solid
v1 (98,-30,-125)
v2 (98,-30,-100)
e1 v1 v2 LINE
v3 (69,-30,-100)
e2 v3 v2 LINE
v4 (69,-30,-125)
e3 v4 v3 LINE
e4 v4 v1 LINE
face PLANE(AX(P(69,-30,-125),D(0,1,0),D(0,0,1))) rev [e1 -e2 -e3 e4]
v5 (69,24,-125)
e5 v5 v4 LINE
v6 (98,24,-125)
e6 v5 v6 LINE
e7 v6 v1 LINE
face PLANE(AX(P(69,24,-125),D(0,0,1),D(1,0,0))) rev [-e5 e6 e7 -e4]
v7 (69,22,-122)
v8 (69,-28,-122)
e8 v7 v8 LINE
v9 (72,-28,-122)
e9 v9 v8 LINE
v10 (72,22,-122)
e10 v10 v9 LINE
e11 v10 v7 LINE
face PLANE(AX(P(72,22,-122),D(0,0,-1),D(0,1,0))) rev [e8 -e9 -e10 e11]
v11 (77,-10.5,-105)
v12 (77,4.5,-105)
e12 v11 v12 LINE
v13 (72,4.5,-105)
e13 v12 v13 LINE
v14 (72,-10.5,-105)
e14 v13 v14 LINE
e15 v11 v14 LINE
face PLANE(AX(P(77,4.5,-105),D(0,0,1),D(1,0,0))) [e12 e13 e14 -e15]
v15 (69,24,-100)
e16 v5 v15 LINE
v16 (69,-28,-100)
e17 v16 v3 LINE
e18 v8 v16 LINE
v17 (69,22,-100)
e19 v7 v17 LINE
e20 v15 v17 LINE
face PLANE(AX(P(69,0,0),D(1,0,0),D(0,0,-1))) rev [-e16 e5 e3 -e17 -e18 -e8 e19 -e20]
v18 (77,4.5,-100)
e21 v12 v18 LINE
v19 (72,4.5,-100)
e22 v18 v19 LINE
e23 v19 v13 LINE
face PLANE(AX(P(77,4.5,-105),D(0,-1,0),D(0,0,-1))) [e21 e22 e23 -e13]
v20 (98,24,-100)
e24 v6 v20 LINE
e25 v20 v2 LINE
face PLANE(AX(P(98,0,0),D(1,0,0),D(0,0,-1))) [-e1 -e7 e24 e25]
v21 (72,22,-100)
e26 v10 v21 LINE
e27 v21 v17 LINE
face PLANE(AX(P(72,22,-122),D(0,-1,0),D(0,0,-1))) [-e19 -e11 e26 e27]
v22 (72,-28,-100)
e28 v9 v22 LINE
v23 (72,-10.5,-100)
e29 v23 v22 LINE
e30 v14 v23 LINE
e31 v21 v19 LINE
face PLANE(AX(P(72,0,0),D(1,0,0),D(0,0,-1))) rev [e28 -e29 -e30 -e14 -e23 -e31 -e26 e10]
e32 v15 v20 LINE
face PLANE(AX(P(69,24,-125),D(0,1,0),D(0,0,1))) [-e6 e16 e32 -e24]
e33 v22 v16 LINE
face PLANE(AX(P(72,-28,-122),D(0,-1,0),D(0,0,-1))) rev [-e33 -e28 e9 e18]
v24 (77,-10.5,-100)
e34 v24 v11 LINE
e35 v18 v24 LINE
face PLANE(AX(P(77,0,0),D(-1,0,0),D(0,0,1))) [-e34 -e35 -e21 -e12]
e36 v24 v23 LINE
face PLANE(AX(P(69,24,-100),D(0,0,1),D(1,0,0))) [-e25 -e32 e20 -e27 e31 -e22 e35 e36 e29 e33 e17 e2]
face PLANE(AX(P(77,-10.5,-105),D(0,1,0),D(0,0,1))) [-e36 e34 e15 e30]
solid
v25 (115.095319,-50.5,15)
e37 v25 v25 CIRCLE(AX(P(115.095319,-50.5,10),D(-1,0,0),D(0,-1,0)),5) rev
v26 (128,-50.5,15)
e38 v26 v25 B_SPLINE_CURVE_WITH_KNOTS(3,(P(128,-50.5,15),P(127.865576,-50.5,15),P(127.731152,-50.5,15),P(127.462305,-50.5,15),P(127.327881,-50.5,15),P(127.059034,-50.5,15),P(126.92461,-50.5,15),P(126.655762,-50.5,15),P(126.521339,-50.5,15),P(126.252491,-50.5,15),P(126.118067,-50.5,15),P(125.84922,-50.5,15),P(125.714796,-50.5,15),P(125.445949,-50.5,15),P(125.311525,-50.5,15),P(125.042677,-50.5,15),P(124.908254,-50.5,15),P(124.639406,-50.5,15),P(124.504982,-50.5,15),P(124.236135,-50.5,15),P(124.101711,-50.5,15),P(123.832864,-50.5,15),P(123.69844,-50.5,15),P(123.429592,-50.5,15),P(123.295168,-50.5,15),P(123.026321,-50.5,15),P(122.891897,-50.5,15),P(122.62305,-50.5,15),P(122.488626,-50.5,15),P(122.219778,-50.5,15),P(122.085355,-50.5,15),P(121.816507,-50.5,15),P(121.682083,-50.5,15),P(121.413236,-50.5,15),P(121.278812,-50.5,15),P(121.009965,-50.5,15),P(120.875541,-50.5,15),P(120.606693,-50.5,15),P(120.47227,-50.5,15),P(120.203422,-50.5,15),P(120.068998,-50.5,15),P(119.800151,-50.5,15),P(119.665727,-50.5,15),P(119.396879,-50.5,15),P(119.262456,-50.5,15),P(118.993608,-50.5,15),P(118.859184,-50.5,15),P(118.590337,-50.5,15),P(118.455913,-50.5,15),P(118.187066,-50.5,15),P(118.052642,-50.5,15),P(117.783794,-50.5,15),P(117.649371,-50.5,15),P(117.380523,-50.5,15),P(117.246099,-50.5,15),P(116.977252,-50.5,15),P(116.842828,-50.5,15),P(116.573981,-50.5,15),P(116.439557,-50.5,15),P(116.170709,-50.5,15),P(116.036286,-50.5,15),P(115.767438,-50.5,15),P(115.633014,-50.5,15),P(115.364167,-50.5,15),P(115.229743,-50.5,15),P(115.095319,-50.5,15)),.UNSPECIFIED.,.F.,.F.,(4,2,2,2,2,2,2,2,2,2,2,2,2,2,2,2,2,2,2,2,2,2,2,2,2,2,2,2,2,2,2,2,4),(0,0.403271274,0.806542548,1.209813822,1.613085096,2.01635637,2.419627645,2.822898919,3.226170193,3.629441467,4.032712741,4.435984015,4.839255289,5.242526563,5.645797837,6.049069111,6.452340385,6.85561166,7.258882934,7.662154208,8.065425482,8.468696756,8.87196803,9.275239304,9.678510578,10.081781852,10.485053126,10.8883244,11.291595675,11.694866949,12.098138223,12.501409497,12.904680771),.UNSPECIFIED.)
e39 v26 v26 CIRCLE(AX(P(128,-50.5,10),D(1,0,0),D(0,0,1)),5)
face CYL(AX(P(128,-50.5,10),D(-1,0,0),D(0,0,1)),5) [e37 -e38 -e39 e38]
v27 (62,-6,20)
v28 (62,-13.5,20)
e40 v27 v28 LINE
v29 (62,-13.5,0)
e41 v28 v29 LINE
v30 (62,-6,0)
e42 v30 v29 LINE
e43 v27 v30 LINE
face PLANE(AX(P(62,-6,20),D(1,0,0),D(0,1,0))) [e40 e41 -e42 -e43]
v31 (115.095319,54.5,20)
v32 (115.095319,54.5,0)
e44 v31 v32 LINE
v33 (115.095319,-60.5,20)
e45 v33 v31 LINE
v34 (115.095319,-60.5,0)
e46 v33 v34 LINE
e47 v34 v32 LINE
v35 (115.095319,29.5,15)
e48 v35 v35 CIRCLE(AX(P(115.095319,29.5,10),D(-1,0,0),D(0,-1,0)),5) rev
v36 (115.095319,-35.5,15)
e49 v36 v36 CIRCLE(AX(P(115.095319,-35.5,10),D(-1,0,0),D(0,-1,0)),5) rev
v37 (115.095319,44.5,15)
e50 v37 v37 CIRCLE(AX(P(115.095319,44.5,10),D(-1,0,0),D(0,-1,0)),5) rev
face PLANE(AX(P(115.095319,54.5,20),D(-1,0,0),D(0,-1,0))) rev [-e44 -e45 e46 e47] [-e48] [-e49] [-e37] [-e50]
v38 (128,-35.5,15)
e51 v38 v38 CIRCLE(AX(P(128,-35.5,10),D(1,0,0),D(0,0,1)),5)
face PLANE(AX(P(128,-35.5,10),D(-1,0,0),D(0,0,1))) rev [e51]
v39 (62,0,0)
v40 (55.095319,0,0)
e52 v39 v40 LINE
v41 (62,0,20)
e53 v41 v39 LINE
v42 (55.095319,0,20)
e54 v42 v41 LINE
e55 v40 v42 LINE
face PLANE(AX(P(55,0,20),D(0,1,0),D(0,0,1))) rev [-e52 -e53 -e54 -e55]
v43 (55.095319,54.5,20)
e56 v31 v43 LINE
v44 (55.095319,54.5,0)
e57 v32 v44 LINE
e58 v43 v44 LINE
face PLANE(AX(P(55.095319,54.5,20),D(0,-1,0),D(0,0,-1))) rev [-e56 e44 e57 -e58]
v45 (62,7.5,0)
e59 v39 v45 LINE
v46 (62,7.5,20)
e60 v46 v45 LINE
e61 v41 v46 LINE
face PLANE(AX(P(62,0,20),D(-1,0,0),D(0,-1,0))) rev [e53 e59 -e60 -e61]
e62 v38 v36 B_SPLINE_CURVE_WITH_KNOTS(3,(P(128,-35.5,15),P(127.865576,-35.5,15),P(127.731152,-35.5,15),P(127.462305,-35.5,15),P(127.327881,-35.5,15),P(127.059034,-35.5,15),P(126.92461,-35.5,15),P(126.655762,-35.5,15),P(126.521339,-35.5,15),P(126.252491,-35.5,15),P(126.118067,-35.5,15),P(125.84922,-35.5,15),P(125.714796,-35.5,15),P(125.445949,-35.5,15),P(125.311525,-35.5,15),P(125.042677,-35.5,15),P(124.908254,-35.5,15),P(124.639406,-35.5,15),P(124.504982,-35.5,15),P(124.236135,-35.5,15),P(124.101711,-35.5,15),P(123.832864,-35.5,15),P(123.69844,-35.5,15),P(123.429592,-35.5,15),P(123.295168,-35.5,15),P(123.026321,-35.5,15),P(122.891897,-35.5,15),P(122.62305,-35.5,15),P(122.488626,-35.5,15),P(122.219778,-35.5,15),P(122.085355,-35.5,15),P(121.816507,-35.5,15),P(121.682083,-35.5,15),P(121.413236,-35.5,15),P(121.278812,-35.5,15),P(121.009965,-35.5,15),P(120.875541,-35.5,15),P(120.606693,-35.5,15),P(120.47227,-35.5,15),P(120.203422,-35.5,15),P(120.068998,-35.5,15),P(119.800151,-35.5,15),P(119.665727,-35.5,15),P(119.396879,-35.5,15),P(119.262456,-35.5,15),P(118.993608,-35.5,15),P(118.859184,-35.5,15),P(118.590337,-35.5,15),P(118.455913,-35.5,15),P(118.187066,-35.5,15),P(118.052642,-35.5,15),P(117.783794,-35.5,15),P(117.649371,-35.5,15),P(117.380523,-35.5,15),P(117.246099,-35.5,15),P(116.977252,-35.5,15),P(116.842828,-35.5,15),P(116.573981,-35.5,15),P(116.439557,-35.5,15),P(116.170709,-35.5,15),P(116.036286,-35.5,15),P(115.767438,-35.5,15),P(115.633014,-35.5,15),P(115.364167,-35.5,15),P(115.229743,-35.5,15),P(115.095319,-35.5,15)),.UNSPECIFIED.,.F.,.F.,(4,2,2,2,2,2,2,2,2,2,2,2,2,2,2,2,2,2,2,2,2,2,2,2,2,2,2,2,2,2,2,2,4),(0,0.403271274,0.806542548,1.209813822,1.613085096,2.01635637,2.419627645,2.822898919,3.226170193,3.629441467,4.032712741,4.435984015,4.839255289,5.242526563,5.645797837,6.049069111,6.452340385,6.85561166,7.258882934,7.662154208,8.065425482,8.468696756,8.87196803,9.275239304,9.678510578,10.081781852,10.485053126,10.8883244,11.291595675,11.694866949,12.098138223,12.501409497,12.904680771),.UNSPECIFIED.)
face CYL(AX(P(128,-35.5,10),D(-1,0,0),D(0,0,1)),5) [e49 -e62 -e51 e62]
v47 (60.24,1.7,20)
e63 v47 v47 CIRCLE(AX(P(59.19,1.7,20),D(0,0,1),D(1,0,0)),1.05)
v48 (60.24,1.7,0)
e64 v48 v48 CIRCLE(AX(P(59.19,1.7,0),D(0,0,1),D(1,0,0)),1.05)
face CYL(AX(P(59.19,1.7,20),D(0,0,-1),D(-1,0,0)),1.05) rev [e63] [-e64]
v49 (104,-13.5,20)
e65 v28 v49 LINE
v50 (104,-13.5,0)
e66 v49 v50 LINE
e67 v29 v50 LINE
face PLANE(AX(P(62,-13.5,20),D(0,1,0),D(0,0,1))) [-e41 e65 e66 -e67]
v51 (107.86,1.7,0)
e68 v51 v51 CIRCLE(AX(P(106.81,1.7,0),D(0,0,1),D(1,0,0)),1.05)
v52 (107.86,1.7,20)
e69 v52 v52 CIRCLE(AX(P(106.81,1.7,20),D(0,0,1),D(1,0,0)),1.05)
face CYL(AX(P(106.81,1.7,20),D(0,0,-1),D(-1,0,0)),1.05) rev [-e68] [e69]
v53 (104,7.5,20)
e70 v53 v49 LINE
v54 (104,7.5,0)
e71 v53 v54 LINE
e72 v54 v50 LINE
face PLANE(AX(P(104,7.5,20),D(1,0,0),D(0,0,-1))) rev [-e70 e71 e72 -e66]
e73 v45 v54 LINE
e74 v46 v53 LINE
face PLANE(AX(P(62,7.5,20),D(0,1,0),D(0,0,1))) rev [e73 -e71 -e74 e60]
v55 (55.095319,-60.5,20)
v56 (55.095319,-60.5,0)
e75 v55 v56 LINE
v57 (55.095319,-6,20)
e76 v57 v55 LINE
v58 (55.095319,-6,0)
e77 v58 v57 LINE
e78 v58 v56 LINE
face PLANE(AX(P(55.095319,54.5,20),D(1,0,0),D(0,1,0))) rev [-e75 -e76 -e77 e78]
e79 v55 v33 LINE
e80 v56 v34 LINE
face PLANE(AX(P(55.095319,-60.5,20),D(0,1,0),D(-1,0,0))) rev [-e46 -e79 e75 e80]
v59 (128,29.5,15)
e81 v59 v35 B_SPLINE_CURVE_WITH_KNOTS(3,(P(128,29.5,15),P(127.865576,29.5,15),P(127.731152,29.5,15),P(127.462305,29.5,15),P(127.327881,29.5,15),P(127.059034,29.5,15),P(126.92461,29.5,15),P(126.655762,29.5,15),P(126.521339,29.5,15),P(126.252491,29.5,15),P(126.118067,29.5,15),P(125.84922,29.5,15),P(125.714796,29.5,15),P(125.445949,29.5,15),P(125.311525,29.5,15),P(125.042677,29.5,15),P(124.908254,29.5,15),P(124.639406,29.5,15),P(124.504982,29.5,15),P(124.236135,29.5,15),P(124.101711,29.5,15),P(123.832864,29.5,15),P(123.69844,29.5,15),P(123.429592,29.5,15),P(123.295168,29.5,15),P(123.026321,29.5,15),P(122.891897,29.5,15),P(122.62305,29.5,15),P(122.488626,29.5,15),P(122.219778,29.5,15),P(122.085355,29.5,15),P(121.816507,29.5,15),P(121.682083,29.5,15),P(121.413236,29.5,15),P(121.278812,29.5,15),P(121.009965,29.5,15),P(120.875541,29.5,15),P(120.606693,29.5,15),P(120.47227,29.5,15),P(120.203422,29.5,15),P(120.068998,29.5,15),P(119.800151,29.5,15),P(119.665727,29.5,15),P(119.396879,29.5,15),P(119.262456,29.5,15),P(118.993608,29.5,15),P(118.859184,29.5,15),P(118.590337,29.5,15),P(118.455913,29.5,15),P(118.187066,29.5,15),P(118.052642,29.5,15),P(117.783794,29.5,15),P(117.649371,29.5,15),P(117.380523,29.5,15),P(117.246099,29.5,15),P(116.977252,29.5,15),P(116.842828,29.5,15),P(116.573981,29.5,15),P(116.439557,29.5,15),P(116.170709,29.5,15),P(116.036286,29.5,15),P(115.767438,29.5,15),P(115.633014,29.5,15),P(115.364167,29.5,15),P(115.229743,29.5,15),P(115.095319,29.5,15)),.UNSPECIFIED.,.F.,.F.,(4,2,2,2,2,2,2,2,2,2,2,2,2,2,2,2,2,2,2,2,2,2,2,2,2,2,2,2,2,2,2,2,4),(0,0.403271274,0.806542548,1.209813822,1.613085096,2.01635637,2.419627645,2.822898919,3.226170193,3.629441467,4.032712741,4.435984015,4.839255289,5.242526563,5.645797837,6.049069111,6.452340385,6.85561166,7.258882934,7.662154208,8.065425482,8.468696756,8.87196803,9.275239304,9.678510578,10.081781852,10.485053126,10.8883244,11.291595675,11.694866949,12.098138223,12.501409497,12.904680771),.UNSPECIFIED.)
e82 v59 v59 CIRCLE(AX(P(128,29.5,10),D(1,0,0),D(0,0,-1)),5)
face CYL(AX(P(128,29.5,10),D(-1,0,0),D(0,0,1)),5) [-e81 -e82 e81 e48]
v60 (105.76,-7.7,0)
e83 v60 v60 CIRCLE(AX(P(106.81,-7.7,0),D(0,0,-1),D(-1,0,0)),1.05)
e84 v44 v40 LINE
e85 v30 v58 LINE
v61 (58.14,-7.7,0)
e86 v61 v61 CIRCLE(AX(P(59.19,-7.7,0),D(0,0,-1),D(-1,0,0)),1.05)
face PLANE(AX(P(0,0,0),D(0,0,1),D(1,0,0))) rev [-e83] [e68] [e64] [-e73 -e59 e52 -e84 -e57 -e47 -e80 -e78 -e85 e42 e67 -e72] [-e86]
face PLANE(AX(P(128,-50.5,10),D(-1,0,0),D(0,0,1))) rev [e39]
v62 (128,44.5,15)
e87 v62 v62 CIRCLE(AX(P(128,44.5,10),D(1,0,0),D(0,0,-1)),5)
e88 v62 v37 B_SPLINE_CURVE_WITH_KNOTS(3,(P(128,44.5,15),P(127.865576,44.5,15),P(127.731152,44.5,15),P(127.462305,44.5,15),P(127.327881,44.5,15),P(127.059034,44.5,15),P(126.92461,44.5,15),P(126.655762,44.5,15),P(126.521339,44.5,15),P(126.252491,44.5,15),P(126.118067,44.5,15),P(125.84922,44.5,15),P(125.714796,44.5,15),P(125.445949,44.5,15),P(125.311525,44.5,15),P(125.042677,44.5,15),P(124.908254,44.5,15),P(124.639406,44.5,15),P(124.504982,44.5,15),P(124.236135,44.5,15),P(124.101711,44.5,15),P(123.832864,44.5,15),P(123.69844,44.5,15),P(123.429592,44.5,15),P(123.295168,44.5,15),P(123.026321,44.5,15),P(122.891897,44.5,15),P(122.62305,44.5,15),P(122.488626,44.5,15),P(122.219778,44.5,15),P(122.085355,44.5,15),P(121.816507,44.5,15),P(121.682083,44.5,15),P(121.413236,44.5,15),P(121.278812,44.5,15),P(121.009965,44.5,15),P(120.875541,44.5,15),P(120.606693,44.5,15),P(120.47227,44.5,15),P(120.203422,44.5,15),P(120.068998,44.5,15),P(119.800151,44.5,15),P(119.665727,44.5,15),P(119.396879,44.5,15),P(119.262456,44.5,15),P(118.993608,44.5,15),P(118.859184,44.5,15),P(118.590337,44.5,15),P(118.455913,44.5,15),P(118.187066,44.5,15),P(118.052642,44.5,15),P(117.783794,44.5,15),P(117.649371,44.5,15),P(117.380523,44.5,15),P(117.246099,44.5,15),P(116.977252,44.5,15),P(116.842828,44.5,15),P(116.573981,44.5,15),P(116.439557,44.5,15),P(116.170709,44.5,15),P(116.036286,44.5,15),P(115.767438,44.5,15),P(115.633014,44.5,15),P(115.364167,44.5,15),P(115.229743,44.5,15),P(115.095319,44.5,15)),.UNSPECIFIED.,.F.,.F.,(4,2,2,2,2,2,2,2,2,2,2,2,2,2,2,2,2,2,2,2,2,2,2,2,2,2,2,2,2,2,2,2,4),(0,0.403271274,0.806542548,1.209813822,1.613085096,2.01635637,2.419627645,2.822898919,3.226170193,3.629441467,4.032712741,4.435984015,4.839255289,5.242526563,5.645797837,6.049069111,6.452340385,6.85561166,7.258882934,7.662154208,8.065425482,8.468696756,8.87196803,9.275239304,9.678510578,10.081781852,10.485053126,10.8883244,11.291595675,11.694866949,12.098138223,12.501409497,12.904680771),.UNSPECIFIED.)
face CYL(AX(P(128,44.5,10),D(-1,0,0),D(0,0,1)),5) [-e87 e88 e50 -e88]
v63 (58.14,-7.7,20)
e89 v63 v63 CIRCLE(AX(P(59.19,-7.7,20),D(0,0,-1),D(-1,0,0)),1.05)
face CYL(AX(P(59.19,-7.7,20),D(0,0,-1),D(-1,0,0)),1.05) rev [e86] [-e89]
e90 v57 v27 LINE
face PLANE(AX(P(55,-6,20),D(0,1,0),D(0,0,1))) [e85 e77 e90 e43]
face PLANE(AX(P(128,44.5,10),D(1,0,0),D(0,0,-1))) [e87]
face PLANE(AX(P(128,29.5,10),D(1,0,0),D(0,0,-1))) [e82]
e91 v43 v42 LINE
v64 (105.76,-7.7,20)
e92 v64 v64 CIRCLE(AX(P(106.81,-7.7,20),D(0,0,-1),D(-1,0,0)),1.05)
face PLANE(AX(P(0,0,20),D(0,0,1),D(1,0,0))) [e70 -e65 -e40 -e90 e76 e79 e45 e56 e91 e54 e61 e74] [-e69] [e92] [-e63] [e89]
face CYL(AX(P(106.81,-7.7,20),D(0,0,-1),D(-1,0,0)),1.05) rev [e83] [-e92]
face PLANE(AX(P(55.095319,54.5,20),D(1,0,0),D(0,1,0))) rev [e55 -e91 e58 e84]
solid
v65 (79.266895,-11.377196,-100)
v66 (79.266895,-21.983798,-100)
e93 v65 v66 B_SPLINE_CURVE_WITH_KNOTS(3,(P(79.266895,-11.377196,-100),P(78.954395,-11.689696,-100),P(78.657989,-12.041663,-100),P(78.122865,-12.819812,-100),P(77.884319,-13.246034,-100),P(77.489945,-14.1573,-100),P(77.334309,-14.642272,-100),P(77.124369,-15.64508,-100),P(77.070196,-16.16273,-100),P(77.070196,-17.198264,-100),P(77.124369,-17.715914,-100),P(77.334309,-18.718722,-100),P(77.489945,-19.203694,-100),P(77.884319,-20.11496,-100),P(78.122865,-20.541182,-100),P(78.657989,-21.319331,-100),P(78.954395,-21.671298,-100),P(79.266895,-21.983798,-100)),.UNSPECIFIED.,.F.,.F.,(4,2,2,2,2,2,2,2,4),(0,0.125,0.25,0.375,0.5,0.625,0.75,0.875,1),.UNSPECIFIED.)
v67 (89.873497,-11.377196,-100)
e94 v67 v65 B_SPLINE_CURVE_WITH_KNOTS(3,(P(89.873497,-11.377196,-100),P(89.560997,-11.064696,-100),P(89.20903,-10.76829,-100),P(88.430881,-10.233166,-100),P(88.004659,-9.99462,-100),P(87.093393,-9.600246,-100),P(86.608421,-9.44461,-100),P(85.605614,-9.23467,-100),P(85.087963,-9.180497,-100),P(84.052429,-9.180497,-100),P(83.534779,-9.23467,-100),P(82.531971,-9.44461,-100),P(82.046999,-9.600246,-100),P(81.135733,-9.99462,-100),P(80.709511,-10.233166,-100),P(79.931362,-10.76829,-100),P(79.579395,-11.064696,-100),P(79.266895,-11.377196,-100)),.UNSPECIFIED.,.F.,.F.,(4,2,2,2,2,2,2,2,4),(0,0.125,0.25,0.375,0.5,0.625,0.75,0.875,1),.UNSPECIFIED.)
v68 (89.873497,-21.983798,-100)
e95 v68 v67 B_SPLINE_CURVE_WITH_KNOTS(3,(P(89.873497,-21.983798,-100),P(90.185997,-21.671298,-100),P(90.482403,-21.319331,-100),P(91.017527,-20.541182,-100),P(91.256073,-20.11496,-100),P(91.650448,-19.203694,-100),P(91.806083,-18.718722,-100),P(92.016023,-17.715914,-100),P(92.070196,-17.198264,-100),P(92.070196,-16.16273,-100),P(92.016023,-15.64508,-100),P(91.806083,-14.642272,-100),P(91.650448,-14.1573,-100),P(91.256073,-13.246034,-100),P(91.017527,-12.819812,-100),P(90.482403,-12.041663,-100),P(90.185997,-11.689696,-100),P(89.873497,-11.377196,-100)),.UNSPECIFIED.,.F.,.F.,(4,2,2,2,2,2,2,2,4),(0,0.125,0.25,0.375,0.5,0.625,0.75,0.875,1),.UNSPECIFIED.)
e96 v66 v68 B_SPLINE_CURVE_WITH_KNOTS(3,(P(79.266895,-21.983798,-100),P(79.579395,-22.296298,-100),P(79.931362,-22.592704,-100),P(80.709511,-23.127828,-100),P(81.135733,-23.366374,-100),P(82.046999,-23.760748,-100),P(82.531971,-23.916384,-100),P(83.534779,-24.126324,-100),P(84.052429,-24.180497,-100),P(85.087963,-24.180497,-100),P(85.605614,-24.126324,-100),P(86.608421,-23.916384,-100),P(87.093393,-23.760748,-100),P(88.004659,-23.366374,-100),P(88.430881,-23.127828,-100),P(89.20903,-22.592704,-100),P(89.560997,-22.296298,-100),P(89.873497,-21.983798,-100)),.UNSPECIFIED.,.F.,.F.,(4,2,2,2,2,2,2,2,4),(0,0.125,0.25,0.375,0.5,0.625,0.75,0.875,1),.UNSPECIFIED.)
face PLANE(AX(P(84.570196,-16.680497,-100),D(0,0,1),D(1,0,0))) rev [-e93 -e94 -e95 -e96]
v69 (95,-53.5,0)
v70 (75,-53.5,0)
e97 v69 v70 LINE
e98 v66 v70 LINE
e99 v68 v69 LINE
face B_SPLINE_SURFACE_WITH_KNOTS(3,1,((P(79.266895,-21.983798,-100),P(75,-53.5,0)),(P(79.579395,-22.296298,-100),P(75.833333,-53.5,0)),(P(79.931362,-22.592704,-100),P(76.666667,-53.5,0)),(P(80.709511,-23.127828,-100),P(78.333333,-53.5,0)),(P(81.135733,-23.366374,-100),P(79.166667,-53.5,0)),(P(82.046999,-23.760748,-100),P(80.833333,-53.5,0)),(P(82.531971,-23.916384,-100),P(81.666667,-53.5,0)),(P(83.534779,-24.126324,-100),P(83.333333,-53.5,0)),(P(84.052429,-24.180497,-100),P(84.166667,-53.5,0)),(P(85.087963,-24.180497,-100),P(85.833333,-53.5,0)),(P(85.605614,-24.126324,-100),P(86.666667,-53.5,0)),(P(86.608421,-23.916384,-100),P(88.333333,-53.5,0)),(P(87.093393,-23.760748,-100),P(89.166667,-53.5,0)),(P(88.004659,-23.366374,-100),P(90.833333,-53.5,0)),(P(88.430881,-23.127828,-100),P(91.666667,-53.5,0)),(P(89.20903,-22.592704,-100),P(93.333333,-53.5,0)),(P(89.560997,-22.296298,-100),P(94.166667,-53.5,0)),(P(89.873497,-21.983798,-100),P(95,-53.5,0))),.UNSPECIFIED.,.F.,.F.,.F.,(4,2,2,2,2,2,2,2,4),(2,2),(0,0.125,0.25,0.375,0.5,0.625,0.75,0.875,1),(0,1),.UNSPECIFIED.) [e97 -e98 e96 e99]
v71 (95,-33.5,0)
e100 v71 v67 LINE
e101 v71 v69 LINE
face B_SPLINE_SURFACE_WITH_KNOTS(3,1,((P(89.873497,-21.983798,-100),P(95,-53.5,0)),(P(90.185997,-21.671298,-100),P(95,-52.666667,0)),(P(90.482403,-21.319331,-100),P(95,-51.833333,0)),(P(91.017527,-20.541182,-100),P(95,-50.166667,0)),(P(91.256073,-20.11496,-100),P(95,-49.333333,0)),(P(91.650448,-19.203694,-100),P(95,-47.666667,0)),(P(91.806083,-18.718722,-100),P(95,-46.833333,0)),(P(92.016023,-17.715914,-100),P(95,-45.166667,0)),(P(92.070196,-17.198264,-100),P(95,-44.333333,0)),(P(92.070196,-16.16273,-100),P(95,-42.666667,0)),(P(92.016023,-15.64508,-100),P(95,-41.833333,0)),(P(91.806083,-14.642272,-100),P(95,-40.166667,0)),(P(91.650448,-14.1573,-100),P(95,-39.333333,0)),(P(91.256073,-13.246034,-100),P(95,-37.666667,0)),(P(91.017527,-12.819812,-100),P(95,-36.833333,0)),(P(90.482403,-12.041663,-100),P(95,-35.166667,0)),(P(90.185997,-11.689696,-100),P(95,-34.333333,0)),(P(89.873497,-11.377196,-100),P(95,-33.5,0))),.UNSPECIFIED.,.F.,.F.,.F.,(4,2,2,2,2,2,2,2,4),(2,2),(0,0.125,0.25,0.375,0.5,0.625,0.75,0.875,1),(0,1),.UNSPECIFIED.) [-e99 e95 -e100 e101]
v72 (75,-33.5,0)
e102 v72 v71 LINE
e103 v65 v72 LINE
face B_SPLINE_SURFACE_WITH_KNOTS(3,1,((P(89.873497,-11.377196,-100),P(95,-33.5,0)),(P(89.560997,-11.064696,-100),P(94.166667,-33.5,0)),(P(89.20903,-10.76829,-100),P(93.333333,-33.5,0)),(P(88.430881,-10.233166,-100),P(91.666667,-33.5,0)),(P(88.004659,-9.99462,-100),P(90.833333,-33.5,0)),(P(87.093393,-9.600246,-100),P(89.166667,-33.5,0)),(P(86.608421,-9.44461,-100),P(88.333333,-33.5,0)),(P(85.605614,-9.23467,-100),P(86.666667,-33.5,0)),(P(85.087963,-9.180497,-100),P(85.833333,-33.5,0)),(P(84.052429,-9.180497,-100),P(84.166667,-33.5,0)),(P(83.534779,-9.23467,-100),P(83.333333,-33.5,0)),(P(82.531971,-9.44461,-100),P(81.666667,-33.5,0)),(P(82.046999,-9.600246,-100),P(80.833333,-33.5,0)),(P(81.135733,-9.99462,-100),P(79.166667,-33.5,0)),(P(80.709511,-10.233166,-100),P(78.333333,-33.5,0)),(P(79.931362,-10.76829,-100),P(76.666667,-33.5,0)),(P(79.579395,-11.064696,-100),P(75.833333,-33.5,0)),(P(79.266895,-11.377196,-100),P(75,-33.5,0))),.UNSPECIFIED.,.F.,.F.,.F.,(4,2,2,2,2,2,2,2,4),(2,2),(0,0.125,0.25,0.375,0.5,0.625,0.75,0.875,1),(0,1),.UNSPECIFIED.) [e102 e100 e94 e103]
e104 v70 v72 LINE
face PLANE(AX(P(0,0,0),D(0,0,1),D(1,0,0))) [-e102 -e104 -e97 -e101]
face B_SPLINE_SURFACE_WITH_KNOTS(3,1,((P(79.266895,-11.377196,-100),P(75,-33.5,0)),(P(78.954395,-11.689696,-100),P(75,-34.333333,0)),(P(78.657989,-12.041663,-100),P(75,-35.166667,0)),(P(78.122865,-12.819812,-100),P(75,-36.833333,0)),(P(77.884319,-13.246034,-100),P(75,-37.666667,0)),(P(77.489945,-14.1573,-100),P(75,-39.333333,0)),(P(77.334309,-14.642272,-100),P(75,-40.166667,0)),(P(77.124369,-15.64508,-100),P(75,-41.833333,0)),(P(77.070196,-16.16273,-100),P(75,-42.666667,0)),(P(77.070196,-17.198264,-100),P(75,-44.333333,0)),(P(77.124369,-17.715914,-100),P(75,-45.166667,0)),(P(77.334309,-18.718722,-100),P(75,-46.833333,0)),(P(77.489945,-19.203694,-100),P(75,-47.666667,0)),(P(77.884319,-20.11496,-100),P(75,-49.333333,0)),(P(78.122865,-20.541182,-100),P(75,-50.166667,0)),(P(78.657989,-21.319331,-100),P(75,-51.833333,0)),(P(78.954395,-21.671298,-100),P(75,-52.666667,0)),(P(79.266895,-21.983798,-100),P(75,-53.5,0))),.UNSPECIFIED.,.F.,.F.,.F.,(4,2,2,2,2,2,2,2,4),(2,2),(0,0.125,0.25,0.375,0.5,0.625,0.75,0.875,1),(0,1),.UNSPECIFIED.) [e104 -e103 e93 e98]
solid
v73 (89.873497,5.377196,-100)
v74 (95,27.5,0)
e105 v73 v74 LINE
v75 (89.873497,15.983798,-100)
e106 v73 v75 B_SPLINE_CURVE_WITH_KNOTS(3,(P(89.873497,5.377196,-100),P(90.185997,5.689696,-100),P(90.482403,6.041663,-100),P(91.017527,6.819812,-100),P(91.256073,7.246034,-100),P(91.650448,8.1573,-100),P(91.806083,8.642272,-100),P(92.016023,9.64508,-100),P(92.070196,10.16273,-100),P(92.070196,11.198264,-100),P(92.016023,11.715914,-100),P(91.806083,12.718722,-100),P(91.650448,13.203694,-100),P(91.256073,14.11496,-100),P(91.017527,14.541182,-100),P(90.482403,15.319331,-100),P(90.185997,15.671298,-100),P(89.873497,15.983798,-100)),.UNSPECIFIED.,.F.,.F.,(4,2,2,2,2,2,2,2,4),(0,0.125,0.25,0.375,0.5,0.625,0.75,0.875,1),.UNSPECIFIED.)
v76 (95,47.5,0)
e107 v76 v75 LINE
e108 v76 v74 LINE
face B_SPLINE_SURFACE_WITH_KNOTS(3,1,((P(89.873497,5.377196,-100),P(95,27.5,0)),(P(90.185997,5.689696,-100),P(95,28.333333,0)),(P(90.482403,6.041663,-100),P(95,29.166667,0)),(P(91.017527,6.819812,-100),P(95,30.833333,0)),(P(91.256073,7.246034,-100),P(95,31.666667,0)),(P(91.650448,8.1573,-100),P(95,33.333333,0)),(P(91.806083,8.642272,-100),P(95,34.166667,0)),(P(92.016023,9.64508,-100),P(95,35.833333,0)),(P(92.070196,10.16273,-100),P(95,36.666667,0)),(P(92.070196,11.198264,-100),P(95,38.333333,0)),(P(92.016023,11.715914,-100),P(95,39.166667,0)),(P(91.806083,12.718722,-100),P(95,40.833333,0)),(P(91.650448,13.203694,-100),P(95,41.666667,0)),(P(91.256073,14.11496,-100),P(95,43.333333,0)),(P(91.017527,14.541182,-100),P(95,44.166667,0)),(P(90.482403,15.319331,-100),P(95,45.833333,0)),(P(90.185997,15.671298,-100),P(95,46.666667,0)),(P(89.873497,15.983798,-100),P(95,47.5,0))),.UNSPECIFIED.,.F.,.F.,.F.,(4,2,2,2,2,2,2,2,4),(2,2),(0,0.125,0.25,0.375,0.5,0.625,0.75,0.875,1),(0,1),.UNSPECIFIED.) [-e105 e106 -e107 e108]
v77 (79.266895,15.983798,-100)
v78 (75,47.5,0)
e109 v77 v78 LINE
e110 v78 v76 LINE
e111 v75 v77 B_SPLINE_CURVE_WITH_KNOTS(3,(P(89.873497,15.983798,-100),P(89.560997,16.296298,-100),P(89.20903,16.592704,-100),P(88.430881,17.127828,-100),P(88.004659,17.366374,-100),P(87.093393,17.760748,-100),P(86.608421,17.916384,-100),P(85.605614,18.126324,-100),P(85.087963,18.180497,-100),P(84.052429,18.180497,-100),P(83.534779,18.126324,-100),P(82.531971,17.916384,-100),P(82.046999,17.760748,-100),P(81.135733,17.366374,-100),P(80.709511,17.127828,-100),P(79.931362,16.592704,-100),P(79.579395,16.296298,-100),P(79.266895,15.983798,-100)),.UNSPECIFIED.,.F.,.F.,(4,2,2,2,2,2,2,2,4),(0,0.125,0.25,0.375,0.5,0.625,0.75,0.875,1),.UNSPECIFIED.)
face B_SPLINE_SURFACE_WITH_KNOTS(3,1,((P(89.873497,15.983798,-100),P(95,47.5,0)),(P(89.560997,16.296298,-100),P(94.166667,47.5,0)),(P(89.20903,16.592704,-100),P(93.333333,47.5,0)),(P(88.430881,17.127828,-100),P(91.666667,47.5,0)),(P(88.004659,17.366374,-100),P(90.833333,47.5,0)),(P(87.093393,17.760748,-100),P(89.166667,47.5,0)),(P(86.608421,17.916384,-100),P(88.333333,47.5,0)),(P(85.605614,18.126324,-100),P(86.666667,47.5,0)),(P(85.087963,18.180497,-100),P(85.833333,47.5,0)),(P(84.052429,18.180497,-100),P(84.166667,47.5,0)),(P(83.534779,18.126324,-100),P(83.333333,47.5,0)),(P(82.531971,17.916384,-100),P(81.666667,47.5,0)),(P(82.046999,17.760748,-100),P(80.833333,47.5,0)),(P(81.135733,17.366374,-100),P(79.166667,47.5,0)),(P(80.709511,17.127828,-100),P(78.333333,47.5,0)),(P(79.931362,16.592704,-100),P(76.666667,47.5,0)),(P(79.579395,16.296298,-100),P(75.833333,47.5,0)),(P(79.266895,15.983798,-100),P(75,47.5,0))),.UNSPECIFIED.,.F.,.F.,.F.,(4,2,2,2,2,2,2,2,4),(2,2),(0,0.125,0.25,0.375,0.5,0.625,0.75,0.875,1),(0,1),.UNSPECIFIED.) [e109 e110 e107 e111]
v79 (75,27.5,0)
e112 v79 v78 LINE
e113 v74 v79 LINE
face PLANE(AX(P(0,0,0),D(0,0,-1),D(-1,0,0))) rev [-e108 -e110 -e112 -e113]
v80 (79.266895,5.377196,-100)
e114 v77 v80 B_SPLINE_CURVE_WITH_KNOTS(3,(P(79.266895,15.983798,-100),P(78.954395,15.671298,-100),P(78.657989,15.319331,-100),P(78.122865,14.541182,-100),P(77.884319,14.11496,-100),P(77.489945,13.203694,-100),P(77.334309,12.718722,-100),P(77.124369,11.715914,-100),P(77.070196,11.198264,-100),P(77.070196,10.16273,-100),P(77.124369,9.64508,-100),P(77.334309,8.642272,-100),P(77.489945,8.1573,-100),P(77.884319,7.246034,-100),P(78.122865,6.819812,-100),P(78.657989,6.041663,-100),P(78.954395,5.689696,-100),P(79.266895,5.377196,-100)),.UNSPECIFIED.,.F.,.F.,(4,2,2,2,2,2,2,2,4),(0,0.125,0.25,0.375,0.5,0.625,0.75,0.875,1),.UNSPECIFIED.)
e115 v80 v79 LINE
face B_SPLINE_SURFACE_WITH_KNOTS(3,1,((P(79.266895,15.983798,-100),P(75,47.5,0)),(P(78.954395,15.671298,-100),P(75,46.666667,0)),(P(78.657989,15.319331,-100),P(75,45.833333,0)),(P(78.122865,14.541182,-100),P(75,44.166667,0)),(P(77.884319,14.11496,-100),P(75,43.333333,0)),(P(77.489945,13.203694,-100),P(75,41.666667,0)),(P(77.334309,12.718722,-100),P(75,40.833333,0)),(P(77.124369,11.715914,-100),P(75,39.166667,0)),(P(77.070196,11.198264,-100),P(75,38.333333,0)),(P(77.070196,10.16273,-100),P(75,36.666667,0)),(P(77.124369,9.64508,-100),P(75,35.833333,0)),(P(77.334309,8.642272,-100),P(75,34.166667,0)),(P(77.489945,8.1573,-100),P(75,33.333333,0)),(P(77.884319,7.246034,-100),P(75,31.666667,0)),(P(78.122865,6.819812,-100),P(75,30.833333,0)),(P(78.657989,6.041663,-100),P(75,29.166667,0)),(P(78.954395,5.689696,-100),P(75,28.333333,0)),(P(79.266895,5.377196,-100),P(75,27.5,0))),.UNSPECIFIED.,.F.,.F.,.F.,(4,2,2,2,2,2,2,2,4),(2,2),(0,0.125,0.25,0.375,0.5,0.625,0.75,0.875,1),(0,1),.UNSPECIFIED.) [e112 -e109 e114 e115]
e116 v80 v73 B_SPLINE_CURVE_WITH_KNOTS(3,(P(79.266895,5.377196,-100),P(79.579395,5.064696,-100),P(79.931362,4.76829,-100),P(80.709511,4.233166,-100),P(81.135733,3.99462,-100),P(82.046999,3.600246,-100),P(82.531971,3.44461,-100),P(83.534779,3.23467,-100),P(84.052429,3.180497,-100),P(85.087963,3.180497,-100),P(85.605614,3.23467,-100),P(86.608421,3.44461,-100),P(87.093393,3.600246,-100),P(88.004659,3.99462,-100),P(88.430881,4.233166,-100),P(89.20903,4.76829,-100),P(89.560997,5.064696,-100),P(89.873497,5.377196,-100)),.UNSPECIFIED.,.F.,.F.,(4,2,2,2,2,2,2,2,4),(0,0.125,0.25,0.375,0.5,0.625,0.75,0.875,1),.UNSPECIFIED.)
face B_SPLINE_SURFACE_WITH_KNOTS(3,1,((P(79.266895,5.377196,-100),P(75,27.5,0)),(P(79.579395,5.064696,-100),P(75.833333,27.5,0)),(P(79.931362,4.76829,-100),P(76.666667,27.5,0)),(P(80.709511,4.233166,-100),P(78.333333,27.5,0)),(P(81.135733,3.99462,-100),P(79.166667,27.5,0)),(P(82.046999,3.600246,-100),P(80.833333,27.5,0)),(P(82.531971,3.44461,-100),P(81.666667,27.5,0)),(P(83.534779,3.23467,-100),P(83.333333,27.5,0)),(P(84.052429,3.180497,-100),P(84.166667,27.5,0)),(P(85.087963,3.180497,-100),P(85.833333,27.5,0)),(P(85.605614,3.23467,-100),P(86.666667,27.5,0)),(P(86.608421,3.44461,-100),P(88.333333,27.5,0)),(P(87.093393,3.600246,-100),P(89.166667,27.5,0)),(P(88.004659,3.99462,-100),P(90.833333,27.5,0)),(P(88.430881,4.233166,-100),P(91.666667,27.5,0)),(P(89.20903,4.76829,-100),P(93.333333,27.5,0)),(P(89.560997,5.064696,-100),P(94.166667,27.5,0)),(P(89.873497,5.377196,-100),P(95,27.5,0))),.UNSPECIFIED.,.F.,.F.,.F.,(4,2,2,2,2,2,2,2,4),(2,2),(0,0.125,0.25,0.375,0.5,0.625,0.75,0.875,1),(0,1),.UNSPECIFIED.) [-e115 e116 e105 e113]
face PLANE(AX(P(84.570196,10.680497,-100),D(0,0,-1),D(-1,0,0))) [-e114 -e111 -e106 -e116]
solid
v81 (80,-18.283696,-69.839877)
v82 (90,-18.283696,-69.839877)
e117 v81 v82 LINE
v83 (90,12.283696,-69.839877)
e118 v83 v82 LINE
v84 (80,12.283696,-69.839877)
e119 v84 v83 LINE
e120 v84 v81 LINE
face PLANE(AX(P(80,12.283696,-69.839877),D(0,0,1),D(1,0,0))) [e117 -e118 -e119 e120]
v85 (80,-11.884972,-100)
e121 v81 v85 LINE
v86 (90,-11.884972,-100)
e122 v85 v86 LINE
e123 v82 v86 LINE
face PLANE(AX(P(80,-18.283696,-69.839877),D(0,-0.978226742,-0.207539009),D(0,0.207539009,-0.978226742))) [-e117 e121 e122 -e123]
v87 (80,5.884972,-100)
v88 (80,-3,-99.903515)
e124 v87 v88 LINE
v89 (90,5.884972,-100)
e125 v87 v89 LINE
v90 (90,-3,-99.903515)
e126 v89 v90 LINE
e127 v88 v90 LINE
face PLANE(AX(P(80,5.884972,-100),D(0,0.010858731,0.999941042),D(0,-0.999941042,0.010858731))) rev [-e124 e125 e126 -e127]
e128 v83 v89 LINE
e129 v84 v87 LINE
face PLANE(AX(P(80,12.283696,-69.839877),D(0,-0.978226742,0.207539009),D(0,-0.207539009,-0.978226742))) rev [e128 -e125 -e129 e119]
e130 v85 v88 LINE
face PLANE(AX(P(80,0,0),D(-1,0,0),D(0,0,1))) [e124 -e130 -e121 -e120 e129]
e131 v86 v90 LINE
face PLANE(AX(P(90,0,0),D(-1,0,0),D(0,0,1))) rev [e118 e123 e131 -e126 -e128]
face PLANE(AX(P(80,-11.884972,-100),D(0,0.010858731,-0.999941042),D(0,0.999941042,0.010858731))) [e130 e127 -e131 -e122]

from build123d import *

# Parameters (mm, degrees)
SKETCH_5_W            = 60
SKETCH_5_H            = 115
EXTRUDE_2_DEPTH       = 20
SKETCH_1_R            = 1.05
CUT_EXTRUDE_4_DEPTH   = 20
SKETCH_6_R            = 5
EXTRUDE_3_DEPTH       = 13
EXTRUDE_6_DEPTH       = 3
EXTRUDE_6_DEPTH_BACK  = 26
SKETCH_13_W           = 25
SKETCH_13_H           = 54
SKETCH_16_W           = 22
SKETCH_16_H           = 50
CUT_EXTRUDE_9_DEPTH   = 3
SKETCH_17_W           = 5
SKETCH_17_H           = 15
CUT_EXTRUDE_10_DEPTH  = 8
EXTRUDE_13_DEPTH      = 5
EXTRUDE_13_DEPTH_BACK = 5


with BuildPart() as part:
    # 草圖5 → 填料-伸長2 (new body)
    with BuildSketch(Plane.XY):
        with Locations((85.095319229, -3)):
            Rectangle(SKETCH_5_W, SKETCH_5_H)
    extrude(amount=EXTRUDE_2_DEPTH)

    # 草圖1 → 除料-伸長4 (cut)
    with BuildSketch(Plane.XY):
        with Locations((59.19, 1.7)):
            Circle(SKETCH_1_R)
        with Locations((106.81, 1.7)):
            Circle(SKETCH_1_R)
        with Locations(Location((106.81, -7.7, 0), (0, 0, 180))):
            Circle(SKETCH_1_R)
        with Locations(Location((59.19, -7.7, 0), (0, 0, 180))):
            Circle(SKETCH_1_R)
        Polygon((55, -3), (55, 0), (62, 0), (62, 7.5), (104, 7.5), (104, -13.5), (62, -13.5), (62, -6), (55, -6), align=None)
    extrude(amount=CUT_EXTRUDE_4_DEPTH, mode=Mode.SUBTRACT)

    # 草圖6 → 填料-伸長3 (add)
    with BuildSketch(Plane(origin=(115, 0, 0), x_dir=(0, 0, -1), z_dir=(1, 0, 0))):
        with Locations(Location((-10, 44.5, 0), (0, 0, 180))):
            Circle(SKETCH_6_R)
        with Locations(Location((-10, 29.5, 0), (0, 0, 180))):
            Circle(SKETCH_6_R)
        with Locations(Location((-10, -35.5, 0), (0, 0, 180))):
            Circle(SKETCH_6_R)
        with Locations(Location((-10, -50.5, 0), (0, 0, 180))):
            Circle(SKETCH_6_R)
    extrude(amount=EXTRUDE_3_DEPTH)


with BuildPart() as body_2:
    # 草圖13 → 填料-伸長6 (new, two sides: drawn at the far end of the back side and taken through both)
    with BuildSketch(Plane(origin=(95, 0, 0), x_dir=(0, 0, -1), z_dir=(1, 0, 0)).offset(-EXTRUDE_6_DEPTH_BACK)):
        with Locations((112.5, -3)):
            Rectangle(SKETCH_13_W, SKETCH_13_H)
    extrude(amount=EXTRUDE_6_DEPTH + EXTRUDE_6_DEPTH_BACK)

    # 草圖16 → 除料-伸長9 (cut)
    with BuildSketch(Plane(origin=(69, 0, 0), x_dir=(0, 0, -1), z_dir=(1, 0, 0))):
        with Locations((111, -3)):
            Rectangle(SKETCH_16_W, SKETCH_16_H)
    extrude(amount=CUT_EXTRUDE_9_DEPTH, mode=Mode.SUBTRACT)

    # 草圖17 → 除料-伸長10 (cut)
    with BuildSketch(Plane(origin=(69, 0, 0), x_dir=(0, 0, -1), z_dir=(1, 0, 0))):
        with Locations((102.5, -3)):
            Rectangle(SKETCH_17_W, SKETCH_17_H)
    extrude(amount=CUT_EXTRUDE_10_DEPTH, mode=Mode.SUBTRACT)


with BuildPart() as body_3:
    # 草圖21 → 填料-伸長13 (new, two sides: drawn at the far end of the back side and taken through both)
    with BuildSketch(Plane(origin=(85, 0, 0), x_dir=(0, 0, -1), z_dir=(1, 0, 0)).offset(-EXTRUDE_13_DEPTH_BACK)):
        Polygon((69.839876567, 12.283695651), (69.839876567, -18.283695651), (100, -11.88497246), (99.903514788, -3), (100, 5.88497246), align=None)
    extrude(amount=EXTRUDE_13_DEPTH + EXTRUDE_13_DEPTH_BACK)


with BuildPart() as body_4:
    # Knit 1: read off the stored shape, not the designer's step
    # Knit 1: loft between two sections, ruled curve by curve
    knit_1_from = [
        Edge.make_bspline([(79.266895317, 5.377196179, -100), (79.579395317, 5.064696179, -100), (79.931362244, 4.768290315, -100), (80.709511323, 4.233165726, -100), (81.135733214, 3.994620259, -100), (82.046998926, 3.600245646, -100), (82.531971403, 3.444609801, -100), (83.534778832, 3.234670337, -100), (84.052429223, 3.180497037, -100), (85.087963129, 3.180497037, -100), (85.60561352, 3.234670337, -100), (86.608420949, 3.444609801, -100), (87.093393426, 3.600245646, -100), (88.004659138, 3.994620259, -100), (88.430881029, 4.233165726, -100), (89.209030109, 4.768290315, -100), (89.560997035, 5.064696179, -100), (89.873497035, 5.377196179, -100)], [0, 0, 0, 0, 0.125, 0.125, 0.25, 0.25, 0.375, 0.375, 0.5, 0.5, 0.625, 0.625, 0.75, 0.75, 0.875, 0.875, 1, 1, 1, 1], 3),
        Edge.make_bspline([(89.873497035, 5.377196179, -100), (90.185997035, 5.689696179, -100), (90.482402899, 6.041663105, -100), (91.017527488, 6.819812184, -100), (91.256072955, 7.246034075, -100), (91.650447568, 8.157299787, -100), (91.806083413, 8.642272265, -100), (92.016022877, 9.645079694, -100), (92.070196176, 10.162730084, -100), (92.070196176, 11.19826399, -100), (92.016022877, 11.715914381, -100), (91.806083413, 12.71872181, -100), (91.650447568, 13.203694288, -100), (91.256072955, 14.11496, -100), (91.017527488, 14.541181891, -100), (90.482402899, 15.31933097, -100), (90.185997035, 15.671297896, -100), (89.873497035, 15.983797896, -100)], [0, 0, 0, 0, 0.125, 0.125, 0.25, 0.25, 0.375, 0.375, 0.5, 0.5, 0.625, 0.625, 0.75, 0.75, 0.875, 0.875, 1, 1, 1, 1], 3),
        Edge.make_bspline([(79.266895317, 15.983797896, -100), (78.954395317, 15.671297896, -100), (78.657989454, 15.31933097, -100), (78.122864864, 14.541181891, -100), (77.884319398, 14.11496, -100), (77.489944785, 13.203694288, -100), (77.334308939, 12.71872181, -100), (77.124369476, 11.715914381, -100), (77.070196176, 11.19826399, -100), (77.070196176, 10.162730084, -100), (77.124369476, 9.645079694, -100), (77.334308939, 8.642272265, -100), (77.489944785, 8.157299787, -100), (77.884319398, 7.246034075, -100), (78.122864864, 6.819812184, -100), (78.657989454, 6.041663105, -100), (78.954395317, 5.689696179, -100), (79.266895317, 5.377196179, -100)], [0, 0, 0, 0, 0.125, 0.125, 0.25, 0.25, 0.375, 0.375, 0.5, 0.5, 0.625, 0.625, 0.75, 0.75, 0.875, 0.875, 1, 1, 1, 1], 3),
        Edge.make_bspline([(89.873497035, 15.983797896, -100), (89.560997035, 16.296297896, -100), (89.209030109, 16.59270376, -100), (88.430881029, 17.127828349, -100), (88.004659138, 17.366373816, -100), (87.093393426, 17.760748429, -100), (86.608420949, 17.916384274, -100), (85.60561352, 18.126323738, -100), (85.087963129, 18.180497037, -100), (84.052429223, 18.180497037, -100), (83.534778832, 18.126323738, -100), (82.531971403, 17.916384274, -100), (82.046998926, 17.760748429, -100), (81.135733214, 17.366373816, -100), (80.709511323, 17.127828349, -100), (79.931362244, 16.59270376, -100), (79.579395317, 16.296297896, -100), (79.266895317, 15.983797896, -100)], [0, 0, 0, 0, 0.125, 0.125, 0.25, 0.25, 0.375, 0.375, 0.5, 0.5, 0.625, 0.625, 0.75, 0.75, 0.875, 0.875, 1, 1, 1, 1], 3),
    ]
    knit_1_to = [
        Edge.make_bspline([(75, 27.5, 0), (75.833333333, 27.5, 0), (76.666666667, 27.5, 0), (78.333333333, 27.5, 0), (79.166666667, 27.5, 0), (80.833333333, 27.5, 0), (81.666666667, 27.5, 0), (83.333333333, 27.5, 0), (84.166666667, 27.5, 0), (85.833333333, 27.5, 0), (86.666666667, 27.5, 0), (88.333333333, 27.5, 0), (89.166666667, 27.5, 0), (90.833333333, 27.5, 0), (91.666666667, 27.5, 0), (93.333333333, 27.5, 0), (94.166666667, 27.5, 0), (95, 27.5, 0)], [0, 0, 0, 0, 0.125, 0.125, 0.25, 0.25, 0.375, 0.375, 0.5, 0.5, 0.625, 0.625, 0.75, 0.75, 0.875, 0.875, 1, 1, 1, 1], 3),
        Edge.make_bspline([(95, 27.5, 0), (95, 28.333333333, 0), (95, 29.166666667, 0), (95, 30.833333333, 0), (95, 31.666666667, 0), (95, 33.333333333, 0), (95, 34.166666667, 0), (95, 35.833333333, 0), (95, 36.666666667, 0), (95, 38.333333333, 0), (95, 39.166666667, 0), (95, 40.833333333, 0), (95, 41.666666667, 0), (95, 43.333333333, 0), (95, 44.166666667, 0), (95, 45.833333333, 0), (95, 46.666666667, 0), (95, 47.5, 0)], [0, 0, 0, 0, 0.125, 0.125, 0.25, 0.25, 0.375, 0.375, 0.5, 0.5, 0.625, 0.625, 0.75, 0.75, 0.875, 0.875, 1, 1, 1, 1], 3),
        Edge.make_bspline([(75, 47.5, 0), (75, 46.666666667, 0), (75, 45.833333333, 0), (75, 44.166666667, 0), (75, 43.333333333, 0), (75, 41.666666667, 0), (75, 40.833333333, 0), (75, 39.166666667, 0), (75, 38.333333333, 0), (75, 36.666666667, 0), (75, 35.833333333, 0), (75, 34.166666667, 0), (75, 33.333333333, 0), (75, 31.666666667, 0), (75, 30.833333333, 0), (75, 29.166666667, 0), (75, 28.333333333, 0), (75, 27.5, 0)], [0, 0, 0, 0, 0.125, 0.125, 0.25, 0.25, 0.375, 0.375, 0.5, 0.5, 0.625, 0.625, 0.75, 0.75, 0.875, 0.875, 1, 1, 1, 1], 3),
        Edge.make_bspline([(95, 47.5, 0), (94.166666667, 47.5, 0), (93.333333333, 47.5, 0), (91.666666667, 47.5, 0), (90.833333333, 47.5, 0), (89.166666667, 47.5, 0), (88.333333333, 47.5, 0), (86.666666667, 47.5, 0), (85.833333333, 47.5, 0), (84.166666667, 47.5, 0), (83.333333333, 47.5, 0), (81.666666667, 47.5, 0), (80.833333333, 47.5, 0), (79.166666667, 47.5, 0), (78.333333333, 47.5, 0), (76.666666667, 47.5, 0), (75.833333333, 47.5, 0), (75, 47.5, 0)], [0, 0, 0, 0, 0.125, 0.125, 0.25, 0.25, 0.375, 0.375, 0.5, 0.5, 0.625, 0.625, 0.75, 0.75, 0.875, 0.875, 1, 1, 1, 1], 3),
    ]
    knit_1 = Solid(Shell([*[Face.make_surface_from_curves(knit_1_from[k], knit_1_to[k]) for k in range(4)], Face(Wire(knit_1_from)), Face(Wire(knit_1_to))]))
    add(knit_1)


with BuildPart() as body_5:
    # Knit 2: read off the stored shape, not the designer's step
    # Knit 2: loft between two sections, ruled curve by curve
    knit_2_from = [
        Edge.make_bspline([(79.266895317, -21.983797896, -100), (79.579395317, -22.296297896, -100), (79.931362244, -22.59270376, -100), (80.709511323, -23.127828349, -100), (81.135733214, -23.366373816, -100), (82.046998926, -23.760748429, -100), (82.531971403, -23.916384274, -100), (83.534778832, -24.126323738, -100), (84.052429223, -24.180497037, -100), (85.087963129, -24.180497037, -100), (85.60561352, -24.126323738, -100), (86.608420949, -23.916384274, -100), (87.093393426, -23.760748429, -100), (88.004659138, -23.366373816, -100), (88.430881029, -23.127828349, -100), (89.209030109, -22.59270376, -100), (89.560997035, -22.296297896, -100), (89.873497035, -21.983797896, -100)], [0, 0, 0, 0, 0.125, 0.125, 0.25, 0.25, 0.375, 0.375, 0.5, 0.5, 0.625, 0.625, 0.75, 0.75, 0.875, 0.875, 1, 1, 1, 1], 3),
        Edge.make_bspline([(89.873497035, -21.983797896, -100), (90.185997035, -21.671297896, -100), (90.482402899, -21.31933097, -100), (91.017527488, -20.541181891, -100), (91.256072955, -20.11496, -100), (91.650447568, -19.203694288, -100), (91.806083413, -18.71872181, -100), (92.016022877, -17.715914381, -100), (92.070196176, -17.19826399, -100), (92.070196176, -16.162730084, -100), (92.016022877, -15.645079694, -100), (91.806083413, -14.642272265, -100), (91.650447568, -14.157299787, -100), (91.256072955, -13.246034075, -100), (91.017527488, -12.819812184, -100), (90.482402899, -12.041663105, -100), (90.185997035, -11.689696179, -100), (89.873497035, -11.377196179, -100)], [0, 0, 0, 0, 0.125, 0.125, 0.25, 0.25, 0.375, 0.375, 0.5, 0.5, 0.625, 0.625, 0.75, 0.75, 0.875, 0.875, 1, 1, 1, 1], 3),
        Edge.make_bspline([(79.266895317, -11.377196179, -100), (78.954395317, -11.689696179, -100), (78.657989454, -12.041663105, -100), (78.122864864, -12.819812184, -100), (77.884319398, -13.246034075, -100), (77.489944785, -14.157299787, -100), (77.334308939, -14.642272265, -100), (77.124369476, -15.645079694, -100), (77.070196176, -16.162730084, -100), (77.070196176, -17.19826399, -100), (77.124369476, -17.715914381, -100), (77.334308939, -18.71872181, -100), (77.489944785, -19.203694288, -100), (77.884319398, -20.11496, -100), (78.122864864, -20.541181891, -100), (78.657989454, -21.31933097, -100), (78.954395317, -21.671297896, -100), (79.266895317, -21.983797896, -100)], [0, 0, 0, 0, 0.125, 0.125, 0.25, 0.25, 0.375, 0.375, 0.5, 0.5, 0.625, 0.625, 0.75, 0.75, 0.875, 0.875, 1, 1, 1, 1], 3),
        Edge.make_bspline([(89.873497035, -11.377196179, -100), (89.560997035, -11.064696179, -100), (89.209030109, -10.768290315, -100), (88.430881029, -10.233165726, -100), (88.004659138, -9.994620259, -100), (87.093393426, -9.600245646, -100), (86.608420949, -9.444609801, -100), (85.60561352, -9.234670337, -100), (85.087963129, -9.180497037, -100), (84.052429223, -9.180497037, -100), (83.534778832, -9.234670337, -100), (82.531971403, -9.444609801, -100), (82.046998926, -9.600245646, -100), (81.135733214, -9.994620259, -100), (80.709511323, -10.233165726, -100), (79.931362244, -10.768290315, -100), (79.579395317, -11.064696179, -100), (79.266895317, -11.377196179, -100)], [0, 0, 0, 0, 0.125, 0.125, 0.25, 0.25, 0.375, 0.375, 0.5, 0.5, 0.625, 0.625, 0.75, 0.75, 0.875, 0.875, 1, 1, 1, 1], 3),
    ]
    knit_2_to = [
        Edge.make_bspline([(75, -53.5, 0), (75.833333333, -53.5, 0), (76.666666667, -53.5, 0), (78.333333333, -53.5, 0), (79.166666667, -53.5, 0), (80.833333333, -53.5, 0), (81.666666667, -53.5, 0), (83.333333333, -53.5, 0), (84.166666667, -53.5, 0), (85.833333333, -53.5, 0), (86.666666667, -53.5, 0), (88.333333333, -53.5, 0), (89.166666667, -53.5, 0), (90.833333333, -53.5, 0), (91.666666667, -53.5, 0), (93.333333333, -53.5, 0), (94.166666667, -53.5, 0), (95, -53.5, 0)], [0, 0, 0, 0, 0.125, 0.125, 0.25, 0.25, 0.375, 0.375, 0.5, 0.5, 0.625, 0.625, 0.75, 0.75, 0.875, 0.875, 1, 1, 1, 1], 3),
        Edge.make_bspline([(95, -53.5, 0), (95, -52.666666667, 0), (95, -51.833333333, 0), (95, -50.166666667, 0), (95, -49.333333333, 0), (95, -47.666666667, 0), (95, -46.833333333, 0), (95, -45.166666667, 0), (95, -44.333333333, 0), (95, -42.666666667, 0), (95, -41.833333333, 0), (95, -40.166666667, 0), (95, -39.333333333, 0), (95, -37.666666667, 0), (95, -36.833333333, 0), (95, -35.166666667, 0), (95, -34.333333333, 0), (95, -33.5, 0)], [0, 0, 0, 0, 0.125, 0.125, 0.25, 0.25, 0.375, 0.375, 0.5, 0.5, 0.625, 0.625, 0.75, 0.75, 0.875, 0.875, 1, 1, 1, 1], 3),
        Edge.make_bspline([(75, -33.5, 0), (75, -34.333333333, 0), (75, -35.166666667, 0), (75, -36.833333333, 0), (75, -37.666666667, 0), (75, -39.333333333, 0), (75, -40.166666667, 0), (75, -41.833333333, 0), (75, -42.666666667, 0), (75, -44.333333333, 0), (75, -45.166666667, 0), (75, -46.833333333, 0), (75, -47.666666667, 0), (75, -49.333333333, 0), (75, -50.166666667, 0), (75, -51.833333333, 0), (75, -52.666666667, 0), (75, -53.5, 0)], [0, 0, 0, 0, 0.125, 0.125, 0.25, 0.25, 0.375, 0.375, 0.5, 0.5, 0.625, 0.625, 0.75, 0.75, 0.875, 0.875, 1, 1, 1, 1], 3),
        Edge.make_bspline([(95, -33.5, 0), (94.166666667, -33.5, 0), (93.333333333, -33.5, 0), (91.666666667, -33.5, 0), (90.833333333, -33.5, 0), (89.166666667, -33.5, 0), (88.333333333, -33.5, 0), (86.666666667, -33.5, 0), (85.833333333, -33.5, 0), (84.166666667, -33.5, 0), (83.333333333, -33.5, 0), (81.666666667, -33.5, 0), (80.833333333, -33.5, 0), (79.166666667, -33.5, 0), (78.333333333, -33.5, 0), (76.666666667, -33.5, 0), (75.833333333, -33.5, 0), (75, -33.5, 0)], [0, 0, 0, 0, 0.125, 0.125, 0.25, 0.25, 0.375, 0.375, 0.5, 0.5, 0.625, 0.625, 0.75, 0.75, 0.875, 0.875, 1, 1, 1, 1], 3),
    ]
    knit_2 = Solid(Shell([*[Face.make_surface_from_curves(knit_2_from[k], knit_2_to[k]) for k in range(4)], Face(Wire(knit_2_from)), Face(Wire(knit_2_to))]))
    add(knit_2)


solid = Compound([part.part, body_2.part, body_3.part, body_4.part, body_5.part])
